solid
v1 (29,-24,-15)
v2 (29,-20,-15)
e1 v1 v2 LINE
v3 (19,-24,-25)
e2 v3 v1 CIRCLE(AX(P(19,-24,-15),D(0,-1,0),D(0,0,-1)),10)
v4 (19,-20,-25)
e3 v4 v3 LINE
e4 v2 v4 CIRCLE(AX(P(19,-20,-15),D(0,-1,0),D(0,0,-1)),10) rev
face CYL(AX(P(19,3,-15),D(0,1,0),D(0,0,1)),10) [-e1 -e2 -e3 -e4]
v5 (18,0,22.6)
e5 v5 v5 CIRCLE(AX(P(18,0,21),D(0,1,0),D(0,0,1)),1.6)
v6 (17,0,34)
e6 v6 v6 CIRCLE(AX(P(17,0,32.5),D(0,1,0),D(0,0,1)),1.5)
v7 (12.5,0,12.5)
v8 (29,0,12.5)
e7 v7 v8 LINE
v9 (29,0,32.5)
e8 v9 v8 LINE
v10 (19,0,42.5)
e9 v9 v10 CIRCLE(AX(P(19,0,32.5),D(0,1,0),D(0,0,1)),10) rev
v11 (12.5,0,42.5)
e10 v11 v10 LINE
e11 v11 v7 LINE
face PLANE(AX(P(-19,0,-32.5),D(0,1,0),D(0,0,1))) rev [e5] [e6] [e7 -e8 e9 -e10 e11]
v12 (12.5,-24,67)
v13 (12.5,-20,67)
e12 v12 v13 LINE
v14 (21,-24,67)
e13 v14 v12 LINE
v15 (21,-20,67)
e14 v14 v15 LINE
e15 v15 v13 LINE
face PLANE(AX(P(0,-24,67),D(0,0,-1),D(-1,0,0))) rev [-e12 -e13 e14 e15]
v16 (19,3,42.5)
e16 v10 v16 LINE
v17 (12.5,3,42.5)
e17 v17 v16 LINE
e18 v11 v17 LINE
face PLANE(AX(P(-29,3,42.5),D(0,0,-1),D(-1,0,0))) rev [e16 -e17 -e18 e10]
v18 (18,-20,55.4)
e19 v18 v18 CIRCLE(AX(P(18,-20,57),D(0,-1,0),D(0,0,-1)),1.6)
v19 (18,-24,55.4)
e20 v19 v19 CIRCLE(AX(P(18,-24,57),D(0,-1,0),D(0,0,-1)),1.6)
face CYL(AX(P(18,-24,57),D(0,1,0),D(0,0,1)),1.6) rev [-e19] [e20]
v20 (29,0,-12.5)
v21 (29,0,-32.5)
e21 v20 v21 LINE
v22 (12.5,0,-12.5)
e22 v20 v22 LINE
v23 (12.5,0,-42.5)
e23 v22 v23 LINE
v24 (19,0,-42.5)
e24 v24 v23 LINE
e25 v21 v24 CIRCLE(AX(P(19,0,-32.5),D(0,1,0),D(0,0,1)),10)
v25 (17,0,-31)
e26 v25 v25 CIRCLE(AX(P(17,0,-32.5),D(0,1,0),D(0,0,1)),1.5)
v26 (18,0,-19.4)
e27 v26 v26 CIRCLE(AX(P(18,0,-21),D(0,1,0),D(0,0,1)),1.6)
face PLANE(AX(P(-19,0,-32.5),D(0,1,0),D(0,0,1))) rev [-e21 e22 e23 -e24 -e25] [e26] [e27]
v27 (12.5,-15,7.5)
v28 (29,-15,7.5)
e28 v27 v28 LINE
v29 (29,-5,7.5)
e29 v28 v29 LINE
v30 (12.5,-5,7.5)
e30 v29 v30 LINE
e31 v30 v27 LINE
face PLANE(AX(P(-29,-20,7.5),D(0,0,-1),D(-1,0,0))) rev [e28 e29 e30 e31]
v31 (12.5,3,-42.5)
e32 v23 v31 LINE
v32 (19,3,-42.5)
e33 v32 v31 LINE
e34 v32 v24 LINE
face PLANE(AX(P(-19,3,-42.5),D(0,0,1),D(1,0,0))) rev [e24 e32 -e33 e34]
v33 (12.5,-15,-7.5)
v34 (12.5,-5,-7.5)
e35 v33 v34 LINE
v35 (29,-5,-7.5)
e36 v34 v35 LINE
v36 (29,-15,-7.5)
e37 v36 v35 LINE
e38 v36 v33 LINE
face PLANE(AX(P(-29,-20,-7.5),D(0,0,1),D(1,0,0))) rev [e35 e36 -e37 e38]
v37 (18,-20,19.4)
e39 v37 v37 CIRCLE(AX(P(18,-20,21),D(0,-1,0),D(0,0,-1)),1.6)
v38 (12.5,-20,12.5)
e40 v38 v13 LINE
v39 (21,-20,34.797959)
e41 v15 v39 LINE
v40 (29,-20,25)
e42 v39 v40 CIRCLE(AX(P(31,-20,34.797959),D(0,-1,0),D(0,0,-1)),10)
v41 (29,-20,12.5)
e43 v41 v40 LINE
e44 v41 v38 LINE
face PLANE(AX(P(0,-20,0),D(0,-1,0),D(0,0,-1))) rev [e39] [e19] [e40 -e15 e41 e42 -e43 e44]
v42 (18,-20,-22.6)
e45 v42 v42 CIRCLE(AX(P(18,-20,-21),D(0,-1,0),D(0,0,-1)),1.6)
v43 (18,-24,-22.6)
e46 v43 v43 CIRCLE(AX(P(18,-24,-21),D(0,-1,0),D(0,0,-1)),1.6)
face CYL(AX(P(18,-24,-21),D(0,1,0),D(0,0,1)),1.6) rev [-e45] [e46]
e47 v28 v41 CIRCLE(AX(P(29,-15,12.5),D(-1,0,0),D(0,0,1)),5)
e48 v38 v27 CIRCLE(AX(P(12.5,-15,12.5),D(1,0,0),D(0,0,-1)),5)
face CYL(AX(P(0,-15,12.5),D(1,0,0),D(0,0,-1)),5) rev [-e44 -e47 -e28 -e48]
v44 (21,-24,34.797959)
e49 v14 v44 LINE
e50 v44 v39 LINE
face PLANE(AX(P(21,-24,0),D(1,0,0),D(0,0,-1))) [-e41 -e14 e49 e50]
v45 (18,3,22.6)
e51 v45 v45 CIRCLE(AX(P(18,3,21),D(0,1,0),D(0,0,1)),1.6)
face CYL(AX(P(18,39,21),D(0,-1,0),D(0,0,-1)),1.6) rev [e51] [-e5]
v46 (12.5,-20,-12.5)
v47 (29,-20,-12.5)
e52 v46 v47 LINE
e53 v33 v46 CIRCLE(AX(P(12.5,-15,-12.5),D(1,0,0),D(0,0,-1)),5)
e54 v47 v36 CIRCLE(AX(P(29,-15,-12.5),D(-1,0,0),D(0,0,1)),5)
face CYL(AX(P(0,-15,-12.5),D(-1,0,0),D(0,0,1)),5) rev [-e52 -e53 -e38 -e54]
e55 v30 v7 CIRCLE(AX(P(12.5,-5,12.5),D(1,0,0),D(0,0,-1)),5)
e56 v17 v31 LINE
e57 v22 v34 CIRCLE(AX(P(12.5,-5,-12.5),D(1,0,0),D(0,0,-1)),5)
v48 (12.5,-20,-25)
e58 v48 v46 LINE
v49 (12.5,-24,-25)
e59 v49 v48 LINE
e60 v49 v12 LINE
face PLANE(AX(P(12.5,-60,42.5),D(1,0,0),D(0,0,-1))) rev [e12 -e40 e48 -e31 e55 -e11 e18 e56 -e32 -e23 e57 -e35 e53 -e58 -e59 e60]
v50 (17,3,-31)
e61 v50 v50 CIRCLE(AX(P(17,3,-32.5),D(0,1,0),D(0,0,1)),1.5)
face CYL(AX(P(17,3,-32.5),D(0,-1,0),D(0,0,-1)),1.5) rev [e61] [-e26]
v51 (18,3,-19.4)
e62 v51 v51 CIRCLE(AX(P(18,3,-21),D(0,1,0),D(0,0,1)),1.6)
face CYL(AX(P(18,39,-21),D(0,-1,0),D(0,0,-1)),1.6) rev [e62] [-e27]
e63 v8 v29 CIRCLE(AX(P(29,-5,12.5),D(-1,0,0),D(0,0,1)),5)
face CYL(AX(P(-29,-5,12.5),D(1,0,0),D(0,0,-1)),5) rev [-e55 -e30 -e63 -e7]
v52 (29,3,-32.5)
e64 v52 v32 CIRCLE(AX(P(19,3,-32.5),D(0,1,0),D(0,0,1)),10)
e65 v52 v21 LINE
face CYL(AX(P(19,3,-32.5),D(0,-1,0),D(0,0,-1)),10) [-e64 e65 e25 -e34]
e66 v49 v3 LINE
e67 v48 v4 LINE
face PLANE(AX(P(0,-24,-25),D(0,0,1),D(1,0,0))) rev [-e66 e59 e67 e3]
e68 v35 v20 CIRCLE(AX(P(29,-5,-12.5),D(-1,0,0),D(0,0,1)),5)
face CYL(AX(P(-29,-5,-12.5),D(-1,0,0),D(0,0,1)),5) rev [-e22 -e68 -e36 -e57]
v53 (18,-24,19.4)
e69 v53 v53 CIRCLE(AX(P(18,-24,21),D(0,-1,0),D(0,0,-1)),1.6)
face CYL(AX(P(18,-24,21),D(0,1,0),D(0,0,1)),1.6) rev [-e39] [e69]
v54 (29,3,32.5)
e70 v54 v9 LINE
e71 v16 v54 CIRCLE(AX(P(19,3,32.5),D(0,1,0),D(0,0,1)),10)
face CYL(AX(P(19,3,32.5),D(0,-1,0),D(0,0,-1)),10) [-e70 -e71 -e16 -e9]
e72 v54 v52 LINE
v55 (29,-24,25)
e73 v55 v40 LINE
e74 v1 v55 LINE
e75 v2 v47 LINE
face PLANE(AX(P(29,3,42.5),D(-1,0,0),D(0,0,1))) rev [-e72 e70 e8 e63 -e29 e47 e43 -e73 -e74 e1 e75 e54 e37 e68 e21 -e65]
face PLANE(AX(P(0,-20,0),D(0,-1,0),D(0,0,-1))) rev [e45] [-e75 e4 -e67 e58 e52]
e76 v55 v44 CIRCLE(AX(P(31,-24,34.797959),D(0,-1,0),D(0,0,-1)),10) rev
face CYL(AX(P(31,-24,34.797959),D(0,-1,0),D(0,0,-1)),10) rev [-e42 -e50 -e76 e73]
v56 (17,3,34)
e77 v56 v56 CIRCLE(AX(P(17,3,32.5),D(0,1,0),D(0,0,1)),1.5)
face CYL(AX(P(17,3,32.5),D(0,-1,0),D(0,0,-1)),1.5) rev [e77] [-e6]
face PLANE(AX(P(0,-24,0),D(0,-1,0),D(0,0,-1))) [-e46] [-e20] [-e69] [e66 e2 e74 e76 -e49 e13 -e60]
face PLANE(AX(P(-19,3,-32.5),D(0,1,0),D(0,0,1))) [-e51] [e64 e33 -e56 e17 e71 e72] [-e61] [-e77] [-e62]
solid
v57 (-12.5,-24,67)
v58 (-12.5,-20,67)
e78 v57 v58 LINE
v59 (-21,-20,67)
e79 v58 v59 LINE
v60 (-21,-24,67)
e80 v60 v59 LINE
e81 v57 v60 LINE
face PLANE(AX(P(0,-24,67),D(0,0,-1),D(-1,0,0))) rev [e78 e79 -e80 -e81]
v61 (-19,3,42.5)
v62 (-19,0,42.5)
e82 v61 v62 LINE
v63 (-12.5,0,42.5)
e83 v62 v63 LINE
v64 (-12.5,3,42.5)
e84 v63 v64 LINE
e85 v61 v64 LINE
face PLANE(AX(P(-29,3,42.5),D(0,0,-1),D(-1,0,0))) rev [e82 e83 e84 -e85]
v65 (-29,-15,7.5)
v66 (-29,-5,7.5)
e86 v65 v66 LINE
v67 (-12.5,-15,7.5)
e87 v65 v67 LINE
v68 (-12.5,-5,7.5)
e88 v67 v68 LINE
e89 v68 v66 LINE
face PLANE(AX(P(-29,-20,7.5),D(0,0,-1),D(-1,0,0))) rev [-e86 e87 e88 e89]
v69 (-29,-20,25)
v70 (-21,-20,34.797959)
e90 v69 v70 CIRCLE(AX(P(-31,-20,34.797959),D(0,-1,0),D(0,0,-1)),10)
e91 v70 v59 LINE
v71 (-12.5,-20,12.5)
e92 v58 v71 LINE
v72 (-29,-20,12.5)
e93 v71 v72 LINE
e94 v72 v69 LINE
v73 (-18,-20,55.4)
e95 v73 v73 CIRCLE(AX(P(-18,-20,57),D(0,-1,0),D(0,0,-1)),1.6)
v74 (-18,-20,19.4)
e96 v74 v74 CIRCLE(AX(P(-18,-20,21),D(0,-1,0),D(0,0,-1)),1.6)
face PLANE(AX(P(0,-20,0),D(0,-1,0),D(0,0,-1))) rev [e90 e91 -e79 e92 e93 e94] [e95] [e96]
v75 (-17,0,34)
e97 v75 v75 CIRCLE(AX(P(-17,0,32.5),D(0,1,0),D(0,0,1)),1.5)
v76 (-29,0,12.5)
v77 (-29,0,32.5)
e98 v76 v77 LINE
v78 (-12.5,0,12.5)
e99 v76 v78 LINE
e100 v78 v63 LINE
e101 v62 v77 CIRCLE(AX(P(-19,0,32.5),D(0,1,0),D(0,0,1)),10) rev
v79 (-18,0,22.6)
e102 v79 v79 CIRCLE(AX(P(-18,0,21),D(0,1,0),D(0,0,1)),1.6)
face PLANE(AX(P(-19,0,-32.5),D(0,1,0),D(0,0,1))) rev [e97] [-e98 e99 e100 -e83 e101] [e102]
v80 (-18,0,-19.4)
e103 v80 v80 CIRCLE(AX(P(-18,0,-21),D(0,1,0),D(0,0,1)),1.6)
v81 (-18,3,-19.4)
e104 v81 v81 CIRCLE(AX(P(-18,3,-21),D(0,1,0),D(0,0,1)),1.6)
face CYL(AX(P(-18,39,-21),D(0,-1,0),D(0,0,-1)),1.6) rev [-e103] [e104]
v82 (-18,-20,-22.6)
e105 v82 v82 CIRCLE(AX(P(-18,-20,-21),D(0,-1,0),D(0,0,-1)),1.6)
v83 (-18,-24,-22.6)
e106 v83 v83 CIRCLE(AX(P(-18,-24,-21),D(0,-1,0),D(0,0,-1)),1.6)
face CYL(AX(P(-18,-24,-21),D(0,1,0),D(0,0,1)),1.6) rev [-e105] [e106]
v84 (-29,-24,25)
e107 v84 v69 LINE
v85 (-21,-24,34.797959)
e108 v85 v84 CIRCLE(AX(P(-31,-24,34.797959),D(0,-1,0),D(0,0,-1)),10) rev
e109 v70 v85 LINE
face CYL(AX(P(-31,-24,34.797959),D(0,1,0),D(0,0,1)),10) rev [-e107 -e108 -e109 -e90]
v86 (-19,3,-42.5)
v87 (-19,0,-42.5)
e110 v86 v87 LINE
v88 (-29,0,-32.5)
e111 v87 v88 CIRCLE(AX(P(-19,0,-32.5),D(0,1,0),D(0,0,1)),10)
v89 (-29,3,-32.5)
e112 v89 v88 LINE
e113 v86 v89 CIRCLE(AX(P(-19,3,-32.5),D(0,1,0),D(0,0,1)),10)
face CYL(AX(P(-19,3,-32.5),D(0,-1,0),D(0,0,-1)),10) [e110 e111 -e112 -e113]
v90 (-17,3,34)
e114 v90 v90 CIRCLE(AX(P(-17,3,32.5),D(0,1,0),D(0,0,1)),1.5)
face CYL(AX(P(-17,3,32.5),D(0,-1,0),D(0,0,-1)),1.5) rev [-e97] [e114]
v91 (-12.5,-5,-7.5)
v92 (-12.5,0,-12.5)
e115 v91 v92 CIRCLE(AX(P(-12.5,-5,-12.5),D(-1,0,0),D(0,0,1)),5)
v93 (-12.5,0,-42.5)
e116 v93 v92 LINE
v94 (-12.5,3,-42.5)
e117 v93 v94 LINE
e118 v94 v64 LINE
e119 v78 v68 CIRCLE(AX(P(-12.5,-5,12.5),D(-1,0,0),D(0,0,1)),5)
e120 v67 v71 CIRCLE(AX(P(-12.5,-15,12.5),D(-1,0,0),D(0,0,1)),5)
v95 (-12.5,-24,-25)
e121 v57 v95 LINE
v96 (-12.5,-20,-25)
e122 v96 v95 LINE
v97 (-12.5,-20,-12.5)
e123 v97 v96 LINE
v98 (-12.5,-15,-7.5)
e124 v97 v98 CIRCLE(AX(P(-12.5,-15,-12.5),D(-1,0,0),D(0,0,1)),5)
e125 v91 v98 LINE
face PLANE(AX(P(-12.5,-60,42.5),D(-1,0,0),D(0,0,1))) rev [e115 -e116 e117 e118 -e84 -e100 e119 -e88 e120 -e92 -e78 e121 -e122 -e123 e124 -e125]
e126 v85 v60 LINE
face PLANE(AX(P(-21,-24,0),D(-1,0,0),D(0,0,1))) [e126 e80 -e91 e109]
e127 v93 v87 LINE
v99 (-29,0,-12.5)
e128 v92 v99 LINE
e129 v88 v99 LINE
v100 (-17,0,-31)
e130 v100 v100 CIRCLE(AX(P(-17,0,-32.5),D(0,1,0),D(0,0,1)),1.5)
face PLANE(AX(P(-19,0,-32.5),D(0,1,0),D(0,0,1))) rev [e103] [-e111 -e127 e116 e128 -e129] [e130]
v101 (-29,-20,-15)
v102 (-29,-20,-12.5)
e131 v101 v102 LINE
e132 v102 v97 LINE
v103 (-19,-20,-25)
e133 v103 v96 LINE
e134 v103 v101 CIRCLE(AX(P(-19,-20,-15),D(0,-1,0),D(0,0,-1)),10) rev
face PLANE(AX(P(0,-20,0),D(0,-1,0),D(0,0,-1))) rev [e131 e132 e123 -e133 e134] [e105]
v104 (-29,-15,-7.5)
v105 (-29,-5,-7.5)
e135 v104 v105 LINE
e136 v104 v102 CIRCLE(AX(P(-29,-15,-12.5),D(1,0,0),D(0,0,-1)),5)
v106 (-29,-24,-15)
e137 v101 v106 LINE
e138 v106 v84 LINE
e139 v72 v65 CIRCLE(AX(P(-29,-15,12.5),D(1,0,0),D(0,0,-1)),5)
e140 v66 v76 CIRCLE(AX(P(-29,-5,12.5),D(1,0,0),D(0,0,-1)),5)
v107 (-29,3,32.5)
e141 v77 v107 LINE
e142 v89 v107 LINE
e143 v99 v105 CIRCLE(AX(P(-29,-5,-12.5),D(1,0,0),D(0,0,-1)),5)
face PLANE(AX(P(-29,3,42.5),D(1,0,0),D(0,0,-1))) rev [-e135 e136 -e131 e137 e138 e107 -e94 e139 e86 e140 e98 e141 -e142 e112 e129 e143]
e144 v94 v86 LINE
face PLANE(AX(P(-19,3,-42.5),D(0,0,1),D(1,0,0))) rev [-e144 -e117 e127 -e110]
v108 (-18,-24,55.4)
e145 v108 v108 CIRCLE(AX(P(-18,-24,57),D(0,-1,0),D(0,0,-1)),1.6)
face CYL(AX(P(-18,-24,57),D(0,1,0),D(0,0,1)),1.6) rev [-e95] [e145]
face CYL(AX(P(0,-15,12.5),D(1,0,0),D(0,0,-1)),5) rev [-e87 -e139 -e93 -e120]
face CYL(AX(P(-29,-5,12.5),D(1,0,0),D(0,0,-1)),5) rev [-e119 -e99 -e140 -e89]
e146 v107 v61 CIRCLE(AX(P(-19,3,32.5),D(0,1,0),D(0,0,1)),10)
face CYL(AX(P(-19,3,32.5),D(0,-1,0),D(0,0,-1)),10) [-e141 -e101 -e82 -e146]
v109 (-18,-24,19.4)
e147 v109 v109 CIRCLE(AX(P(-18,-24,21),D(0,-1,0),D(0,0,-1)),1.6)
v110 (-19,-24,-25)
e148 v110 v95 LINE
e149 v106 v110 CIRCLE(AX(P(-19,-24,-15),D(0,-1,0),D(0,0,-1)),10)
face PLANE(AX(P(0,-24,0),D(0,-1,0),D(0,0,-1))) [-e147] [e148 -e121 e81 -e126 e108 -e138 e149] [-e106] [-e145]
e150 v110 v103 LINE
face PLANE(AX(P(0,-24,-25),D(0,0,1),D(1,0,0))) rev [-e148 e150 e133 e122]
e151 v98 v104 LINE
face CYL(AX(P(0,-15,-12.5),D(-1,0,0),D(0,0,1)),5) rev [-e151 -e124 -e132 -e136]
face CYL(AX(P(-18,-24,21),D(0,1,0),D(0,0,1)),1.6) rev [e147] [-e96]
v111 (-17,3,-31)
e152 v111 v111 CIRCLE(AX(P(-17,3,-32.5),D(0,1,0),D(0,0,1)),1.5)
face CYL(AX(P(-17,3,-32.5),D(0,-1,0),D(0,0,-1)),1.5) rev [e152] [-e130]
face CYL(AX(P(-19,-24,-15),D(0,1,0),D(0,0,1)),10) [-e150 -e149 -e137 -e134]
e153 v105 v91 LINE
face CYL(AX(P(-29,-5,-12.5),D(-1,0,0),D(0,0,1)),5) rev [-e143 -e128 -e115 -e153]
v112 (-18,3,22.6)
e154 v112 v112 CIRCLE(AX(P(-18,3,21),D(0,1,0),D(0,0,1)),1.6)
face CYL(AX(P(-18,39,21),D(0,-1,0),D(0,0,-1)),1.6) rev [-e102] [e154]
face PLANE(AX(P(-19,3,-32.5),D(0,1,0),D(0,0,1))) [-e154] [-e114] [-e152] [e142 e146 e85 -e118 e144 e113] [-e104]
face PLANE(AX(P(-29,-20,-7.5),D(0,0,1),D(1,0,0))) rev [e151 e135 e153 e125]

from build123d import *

# Parameters (mm, degrees)
SKETCH_1_R          = 1.5
EXTRUDE_1_DEPTH     = 3
SKETCH_4_W          = 58
SKETCH_4_H          = 15
EXTRUDE_2_DEPTH     = 20
SKETCH_5_R          = 1.6
EXTRUDE_3_DEPTH     = 4
FILLET_1_R          = 10
CUT_EXTRUDE_START   = -63
SKETCH_6_R          = 1.6
CUT_EXTRUDE_2_DEPTH = 63
SKETCH_7_W          = 25
SKETCH_7_H          = 85
CUT_EXTRUDE_3_DEPTH = 63
SKETCH_8_W          = 25
SKETCH_8_H          = 24.5
CUT_EXTRUDE_4_DEPTH = 63
FILLET_2_R          = 5
FILLET_3_R          = 5
FILLET_4_R          = 5


with BuildPart() as part:
    # 草图1 → 凸台-拉伸1 (new body)
    with BuildSketch(Plane(origin=(0, 0, 0), x_dir=(1, 0, 0), z_dir=(0, 1, 0))):
        with BuildLine():
            Line((-29, -42.5), (29, -42.5))
            Line((29, -42.5), (29, 32.5))
            ThreePointArc((29, 32.5), (26.071067812, 39.571067812), (19, 42.5))
            Line((19, 42.5), (-19, 42.5))
            ThreePointArc((-19, 42.5), (-26.071067812, 39.571067812), (-29, 32.5))
            Line((-29, 32.5), (-29, -42.5))
        make_face()
        with Locations(Location((17, 32.5, 0), (0, 0, 270))):
            Circle(SKETCH_1_R, mode=Mode.SUBTRACT)
        with Locations(Location((-17, 32.5, 0), (0, 0, 270))):
            Circle(SKETCH_1_R, mode=Mode.SUBTRACT)
        with Locations(Location((-17, -32.5, 0), (0, 0, 270))):
            Circle(SKETCH_1_R, mode=Mode.SUBTRACT)
        with Locations(Location((17, -32.5, 0), (0, 0, 270))):
            Circle(SKETCH_1_R, mode=Mode.SUBTRACT)
    extrude(amount=EXTRUDE_1_DEPTH)

    # 草图4 → 凸台-拉伸2 (add)
    with BuildSketch(Plane.XZ):
        Rectangle(SKETCH_4_W, SKETCH_4_H)
    extrude(amount=EXTRUDE_2_DEPTH)

    # 草图5 → 凸台-拉伸3 (add)
    with BuildSketch(Plane.XZ.offset(20)):
        Polygon((21, 25), (21, 67), (-21, 67), (-21, 25), (-29, 25), (-29, -25), (29, -25), (29, 25), align=None)
        with Locations(Location((-18, -21, 0), (0, 0, 270))):
            Circle(SKETCH_5_R, mode=Mode.SUBTRACT)
        with Locations(Location((-18, 21, 0), (0, 0, 270))):
            Circle(SKETCH_5_R, mode=Mode.SUBTRACT)
        with Locations(Location((18, 21, 0), (0, 0, 270))):
            Circle(SKETCH_5_R, mode=Mode.SUBTRACT)
        with Locations(Location((18, -21, 0), (0, 0, 270))):
            Circle(SKETCH_5_R, mode=Mode.SUBTRACT)
        with Locations(Location((-18, 57, 0), (0, 0, 270))):
            Circle(SKETCH_5_R, mode=Mode.SUBTRACT)
        with Locations(Location((18, 57, 0), (0, 0, 270))):
            Circle(SKETCH_5_R, mode=Mode.SUBTRACT)
    extrude(amount=EXTRUDE_3_DEPTH)

    # 圆角1
    # the kernel refuses this fillet: 10 mm, written as the material it adds along each edge
    with BuildSketch(Plane(origin=(-21, -20, 25), x_dir=(0, 0, 1), z_dir=(0, -1, 0))) as fillet_1_piece_1:
        with BuildLine():
            CenterArc((9.797958971, 10), FILLET_1_R, 191.536959033, 78.463040967)
            Line((0, 8), (0, 0))
            Line((0, 0), (9.797958971, 0))
        make_face()
    extrude(amount=4)
    with BuildSketch(Plane(origin=(21, -20, 25), x_dir=(0, 0, 1), z_dir=(0, -1, 0))) as fillet_1_piece_2:
        with BuildLine():
            CenterArc((9.797958971, -10), FILLET_1_R, 90, 78.463040967)
            Line((0, -8), (0, 0))
            Line((0, 0), (9.797958971, 0))
        make_face()
    extrude(amount=4)
    # the kernel refuses this fillet: 10 mm, written as the material it takes off along each edge
    with BuildSketch(Plane(origin=(29, 0, 42.5), x_dir=(0, 0, -1), z_dir=(0, 1, 0))) as fillet_1_2_piece_1:
        with BuildLine():
            CenterArc((FILLET_1_R, FILLET_1_R), FILLET_1_R, 180, 90)
            Line((0, FILLET_1_R), (0, 0))
            Line((0, 0), (FILLET_1_R, 0))
        make_face()
    extrude(amount=28, mode=Mode.SUBTRACT)
    with BuildSketch(Plane(origin=(-29, 0, 42.5), x_dir=(0, 0, -1), z_dir=(0, 1, 0))) as fillet_1_2_piece_2:
        with BuildLine():
            CenterArc((FILLET_1_R, -FILLET_1_R), FILLET_1_R, 90, 90)
            Line((0, -FILLET_1_R), (0, 0))
            Line((0, 0), (FILLET_1_R, 0))
        make_face()
    extrude(amount=28, mode=Mode.SUBTRACT)
    with BuildSketch(Plane(origin=(-29, -20, -25), x_dir=(0, 0, 1), z_dir=(0, -1, 0))) as fillet_1_2_piece_3:
        with BuildLine():
            CenterArc((FILLET_1_R, -FILLET_1_R), FILLET_1_R, 90, 90)
            Line((0, -FILLET_1_R), (0, 0))
            Line((0, 0), (FILLET_1_R, 0))
        make_face()
    extrude(amount=29, mode=Mode.SUBTRACT)
    with BuildSketch(Plane(origin=(29, -20, -25), x_dir=(0, 0, 1), z_dir=(0, -1, 0))) as fillet_1_2_piece_4:
        with BuildLine():
            CenterArc((FILLET_1_R, FILLET_1_R), FILLET_1_R, 180, 90)
            Line((0, FILLET_1_R), (0, 0))
            Line((0, 0), (FILLET_1_R, 0))
        make_face()
    extrude(amount=29, mode=Mode.SUBTRACT)

    # 草图6 → 切除-拉伸2 (cut)
    with BuildSketch(Plane.XZ.offset(24).offset(CUT_EXTRUDE_START)):
        with Locations(Location((18, 21, 0), (0, 0, 270))):
            Circle(SKETCH_6_R)
        with Locations(Location((18, -21, 0), (0, 0, 270))):
            Circle(SKETCH_6_R)
        with Locations(Location((-18, -21, 0), (0, 0, 270))):
            Circle(SKETCH_6_R)
        with Locations(Location((-18, 21, 0), (0, 0, 270))):
            Circle(SKETCH_6_R)
    extrude(amount=CUT_EXTRUDE_2_DEPTH, mode=Mode.SUBTRACT)

    # 草图7 → 切除-拉伸3 (cut)
    with BuildSketch(Plane(origin=(0, 3, 0), x_dir=(1, 0, 0), z_dir=(0, 1, 0))):
        Rectangle(SKETCH_7_W, SKETCH_7_H)
    extrude(amount=-CUT_EXTRUDE_3_DEPTH, mode=Mode.SUBTRACT)

    # 草图8 → 切除-拉伸4 (cut)
    with BuildSketch(Plane(origin=(0, -20, 0), x_dir=(1, 0, 0), z_dir=(0, 1, 0))):
        with Locations((0, -54.75)):
            Rectangle(SKETCH_8_W, SKETCH_8_H)
    extrude(amount=-CUT_EXTRUDE_4_DEPTH, mode=Mode.SUBTRACT)


with BuildPart() as cut_extrude_4_piece_1:
    # of the separate pieces the step leaves, piece 1, a body of its own (cut_extrude_4_pieces)
    add(part.part.solids().sort_by_distance((-12.5, -20, 67))[0])

    # 圆角2
    fillet_2_edges = [cut_extrude_4_piece_1.edges().sort_by_distance(p)[0] for p in [
        (-20.75, 0, 7.5),
        (-20.75, 0, -7.5),
    ]]
    fillet(fillet_2_edges, radius=FILLET_2_R)

    # 圆角4
    fillet_4_edges = [cut_extrude_4_piece_1.edges().sort_by_distance(p)[0] for p in [
        (-20.75, -20, 7.5),
        (-20.75, -20, -7.5),
    ]]
    fillet(fillet_4_edges, radius=FILLET_4_R)


with BuildPart() as cut_extrude_4_piece_2:
    # of the separate pieces the step leaves, piece 2, a body of its own (cut_extrude_4_pieces)
    add(part.part.solids().sort_by_distance((21, -20, 34.797958971))[0])

    # 圆角3
    fillet_3_edges = [cut_extrude_4_piece_2.edges().sort_by_distance(p)[0] for p in [
        (20.75, 0, 7.5),
        (20.75, 0, -7.5),
        (20.75, -20, -7.5),
        (20.75, -20, 7.5),
    ]]
    fillet(fillet_3_edges, radius=FILLET_3_R)


solid = Compound([cut_extrude_4_piece_1.part, cut_extrude_4_piece_2.part])
